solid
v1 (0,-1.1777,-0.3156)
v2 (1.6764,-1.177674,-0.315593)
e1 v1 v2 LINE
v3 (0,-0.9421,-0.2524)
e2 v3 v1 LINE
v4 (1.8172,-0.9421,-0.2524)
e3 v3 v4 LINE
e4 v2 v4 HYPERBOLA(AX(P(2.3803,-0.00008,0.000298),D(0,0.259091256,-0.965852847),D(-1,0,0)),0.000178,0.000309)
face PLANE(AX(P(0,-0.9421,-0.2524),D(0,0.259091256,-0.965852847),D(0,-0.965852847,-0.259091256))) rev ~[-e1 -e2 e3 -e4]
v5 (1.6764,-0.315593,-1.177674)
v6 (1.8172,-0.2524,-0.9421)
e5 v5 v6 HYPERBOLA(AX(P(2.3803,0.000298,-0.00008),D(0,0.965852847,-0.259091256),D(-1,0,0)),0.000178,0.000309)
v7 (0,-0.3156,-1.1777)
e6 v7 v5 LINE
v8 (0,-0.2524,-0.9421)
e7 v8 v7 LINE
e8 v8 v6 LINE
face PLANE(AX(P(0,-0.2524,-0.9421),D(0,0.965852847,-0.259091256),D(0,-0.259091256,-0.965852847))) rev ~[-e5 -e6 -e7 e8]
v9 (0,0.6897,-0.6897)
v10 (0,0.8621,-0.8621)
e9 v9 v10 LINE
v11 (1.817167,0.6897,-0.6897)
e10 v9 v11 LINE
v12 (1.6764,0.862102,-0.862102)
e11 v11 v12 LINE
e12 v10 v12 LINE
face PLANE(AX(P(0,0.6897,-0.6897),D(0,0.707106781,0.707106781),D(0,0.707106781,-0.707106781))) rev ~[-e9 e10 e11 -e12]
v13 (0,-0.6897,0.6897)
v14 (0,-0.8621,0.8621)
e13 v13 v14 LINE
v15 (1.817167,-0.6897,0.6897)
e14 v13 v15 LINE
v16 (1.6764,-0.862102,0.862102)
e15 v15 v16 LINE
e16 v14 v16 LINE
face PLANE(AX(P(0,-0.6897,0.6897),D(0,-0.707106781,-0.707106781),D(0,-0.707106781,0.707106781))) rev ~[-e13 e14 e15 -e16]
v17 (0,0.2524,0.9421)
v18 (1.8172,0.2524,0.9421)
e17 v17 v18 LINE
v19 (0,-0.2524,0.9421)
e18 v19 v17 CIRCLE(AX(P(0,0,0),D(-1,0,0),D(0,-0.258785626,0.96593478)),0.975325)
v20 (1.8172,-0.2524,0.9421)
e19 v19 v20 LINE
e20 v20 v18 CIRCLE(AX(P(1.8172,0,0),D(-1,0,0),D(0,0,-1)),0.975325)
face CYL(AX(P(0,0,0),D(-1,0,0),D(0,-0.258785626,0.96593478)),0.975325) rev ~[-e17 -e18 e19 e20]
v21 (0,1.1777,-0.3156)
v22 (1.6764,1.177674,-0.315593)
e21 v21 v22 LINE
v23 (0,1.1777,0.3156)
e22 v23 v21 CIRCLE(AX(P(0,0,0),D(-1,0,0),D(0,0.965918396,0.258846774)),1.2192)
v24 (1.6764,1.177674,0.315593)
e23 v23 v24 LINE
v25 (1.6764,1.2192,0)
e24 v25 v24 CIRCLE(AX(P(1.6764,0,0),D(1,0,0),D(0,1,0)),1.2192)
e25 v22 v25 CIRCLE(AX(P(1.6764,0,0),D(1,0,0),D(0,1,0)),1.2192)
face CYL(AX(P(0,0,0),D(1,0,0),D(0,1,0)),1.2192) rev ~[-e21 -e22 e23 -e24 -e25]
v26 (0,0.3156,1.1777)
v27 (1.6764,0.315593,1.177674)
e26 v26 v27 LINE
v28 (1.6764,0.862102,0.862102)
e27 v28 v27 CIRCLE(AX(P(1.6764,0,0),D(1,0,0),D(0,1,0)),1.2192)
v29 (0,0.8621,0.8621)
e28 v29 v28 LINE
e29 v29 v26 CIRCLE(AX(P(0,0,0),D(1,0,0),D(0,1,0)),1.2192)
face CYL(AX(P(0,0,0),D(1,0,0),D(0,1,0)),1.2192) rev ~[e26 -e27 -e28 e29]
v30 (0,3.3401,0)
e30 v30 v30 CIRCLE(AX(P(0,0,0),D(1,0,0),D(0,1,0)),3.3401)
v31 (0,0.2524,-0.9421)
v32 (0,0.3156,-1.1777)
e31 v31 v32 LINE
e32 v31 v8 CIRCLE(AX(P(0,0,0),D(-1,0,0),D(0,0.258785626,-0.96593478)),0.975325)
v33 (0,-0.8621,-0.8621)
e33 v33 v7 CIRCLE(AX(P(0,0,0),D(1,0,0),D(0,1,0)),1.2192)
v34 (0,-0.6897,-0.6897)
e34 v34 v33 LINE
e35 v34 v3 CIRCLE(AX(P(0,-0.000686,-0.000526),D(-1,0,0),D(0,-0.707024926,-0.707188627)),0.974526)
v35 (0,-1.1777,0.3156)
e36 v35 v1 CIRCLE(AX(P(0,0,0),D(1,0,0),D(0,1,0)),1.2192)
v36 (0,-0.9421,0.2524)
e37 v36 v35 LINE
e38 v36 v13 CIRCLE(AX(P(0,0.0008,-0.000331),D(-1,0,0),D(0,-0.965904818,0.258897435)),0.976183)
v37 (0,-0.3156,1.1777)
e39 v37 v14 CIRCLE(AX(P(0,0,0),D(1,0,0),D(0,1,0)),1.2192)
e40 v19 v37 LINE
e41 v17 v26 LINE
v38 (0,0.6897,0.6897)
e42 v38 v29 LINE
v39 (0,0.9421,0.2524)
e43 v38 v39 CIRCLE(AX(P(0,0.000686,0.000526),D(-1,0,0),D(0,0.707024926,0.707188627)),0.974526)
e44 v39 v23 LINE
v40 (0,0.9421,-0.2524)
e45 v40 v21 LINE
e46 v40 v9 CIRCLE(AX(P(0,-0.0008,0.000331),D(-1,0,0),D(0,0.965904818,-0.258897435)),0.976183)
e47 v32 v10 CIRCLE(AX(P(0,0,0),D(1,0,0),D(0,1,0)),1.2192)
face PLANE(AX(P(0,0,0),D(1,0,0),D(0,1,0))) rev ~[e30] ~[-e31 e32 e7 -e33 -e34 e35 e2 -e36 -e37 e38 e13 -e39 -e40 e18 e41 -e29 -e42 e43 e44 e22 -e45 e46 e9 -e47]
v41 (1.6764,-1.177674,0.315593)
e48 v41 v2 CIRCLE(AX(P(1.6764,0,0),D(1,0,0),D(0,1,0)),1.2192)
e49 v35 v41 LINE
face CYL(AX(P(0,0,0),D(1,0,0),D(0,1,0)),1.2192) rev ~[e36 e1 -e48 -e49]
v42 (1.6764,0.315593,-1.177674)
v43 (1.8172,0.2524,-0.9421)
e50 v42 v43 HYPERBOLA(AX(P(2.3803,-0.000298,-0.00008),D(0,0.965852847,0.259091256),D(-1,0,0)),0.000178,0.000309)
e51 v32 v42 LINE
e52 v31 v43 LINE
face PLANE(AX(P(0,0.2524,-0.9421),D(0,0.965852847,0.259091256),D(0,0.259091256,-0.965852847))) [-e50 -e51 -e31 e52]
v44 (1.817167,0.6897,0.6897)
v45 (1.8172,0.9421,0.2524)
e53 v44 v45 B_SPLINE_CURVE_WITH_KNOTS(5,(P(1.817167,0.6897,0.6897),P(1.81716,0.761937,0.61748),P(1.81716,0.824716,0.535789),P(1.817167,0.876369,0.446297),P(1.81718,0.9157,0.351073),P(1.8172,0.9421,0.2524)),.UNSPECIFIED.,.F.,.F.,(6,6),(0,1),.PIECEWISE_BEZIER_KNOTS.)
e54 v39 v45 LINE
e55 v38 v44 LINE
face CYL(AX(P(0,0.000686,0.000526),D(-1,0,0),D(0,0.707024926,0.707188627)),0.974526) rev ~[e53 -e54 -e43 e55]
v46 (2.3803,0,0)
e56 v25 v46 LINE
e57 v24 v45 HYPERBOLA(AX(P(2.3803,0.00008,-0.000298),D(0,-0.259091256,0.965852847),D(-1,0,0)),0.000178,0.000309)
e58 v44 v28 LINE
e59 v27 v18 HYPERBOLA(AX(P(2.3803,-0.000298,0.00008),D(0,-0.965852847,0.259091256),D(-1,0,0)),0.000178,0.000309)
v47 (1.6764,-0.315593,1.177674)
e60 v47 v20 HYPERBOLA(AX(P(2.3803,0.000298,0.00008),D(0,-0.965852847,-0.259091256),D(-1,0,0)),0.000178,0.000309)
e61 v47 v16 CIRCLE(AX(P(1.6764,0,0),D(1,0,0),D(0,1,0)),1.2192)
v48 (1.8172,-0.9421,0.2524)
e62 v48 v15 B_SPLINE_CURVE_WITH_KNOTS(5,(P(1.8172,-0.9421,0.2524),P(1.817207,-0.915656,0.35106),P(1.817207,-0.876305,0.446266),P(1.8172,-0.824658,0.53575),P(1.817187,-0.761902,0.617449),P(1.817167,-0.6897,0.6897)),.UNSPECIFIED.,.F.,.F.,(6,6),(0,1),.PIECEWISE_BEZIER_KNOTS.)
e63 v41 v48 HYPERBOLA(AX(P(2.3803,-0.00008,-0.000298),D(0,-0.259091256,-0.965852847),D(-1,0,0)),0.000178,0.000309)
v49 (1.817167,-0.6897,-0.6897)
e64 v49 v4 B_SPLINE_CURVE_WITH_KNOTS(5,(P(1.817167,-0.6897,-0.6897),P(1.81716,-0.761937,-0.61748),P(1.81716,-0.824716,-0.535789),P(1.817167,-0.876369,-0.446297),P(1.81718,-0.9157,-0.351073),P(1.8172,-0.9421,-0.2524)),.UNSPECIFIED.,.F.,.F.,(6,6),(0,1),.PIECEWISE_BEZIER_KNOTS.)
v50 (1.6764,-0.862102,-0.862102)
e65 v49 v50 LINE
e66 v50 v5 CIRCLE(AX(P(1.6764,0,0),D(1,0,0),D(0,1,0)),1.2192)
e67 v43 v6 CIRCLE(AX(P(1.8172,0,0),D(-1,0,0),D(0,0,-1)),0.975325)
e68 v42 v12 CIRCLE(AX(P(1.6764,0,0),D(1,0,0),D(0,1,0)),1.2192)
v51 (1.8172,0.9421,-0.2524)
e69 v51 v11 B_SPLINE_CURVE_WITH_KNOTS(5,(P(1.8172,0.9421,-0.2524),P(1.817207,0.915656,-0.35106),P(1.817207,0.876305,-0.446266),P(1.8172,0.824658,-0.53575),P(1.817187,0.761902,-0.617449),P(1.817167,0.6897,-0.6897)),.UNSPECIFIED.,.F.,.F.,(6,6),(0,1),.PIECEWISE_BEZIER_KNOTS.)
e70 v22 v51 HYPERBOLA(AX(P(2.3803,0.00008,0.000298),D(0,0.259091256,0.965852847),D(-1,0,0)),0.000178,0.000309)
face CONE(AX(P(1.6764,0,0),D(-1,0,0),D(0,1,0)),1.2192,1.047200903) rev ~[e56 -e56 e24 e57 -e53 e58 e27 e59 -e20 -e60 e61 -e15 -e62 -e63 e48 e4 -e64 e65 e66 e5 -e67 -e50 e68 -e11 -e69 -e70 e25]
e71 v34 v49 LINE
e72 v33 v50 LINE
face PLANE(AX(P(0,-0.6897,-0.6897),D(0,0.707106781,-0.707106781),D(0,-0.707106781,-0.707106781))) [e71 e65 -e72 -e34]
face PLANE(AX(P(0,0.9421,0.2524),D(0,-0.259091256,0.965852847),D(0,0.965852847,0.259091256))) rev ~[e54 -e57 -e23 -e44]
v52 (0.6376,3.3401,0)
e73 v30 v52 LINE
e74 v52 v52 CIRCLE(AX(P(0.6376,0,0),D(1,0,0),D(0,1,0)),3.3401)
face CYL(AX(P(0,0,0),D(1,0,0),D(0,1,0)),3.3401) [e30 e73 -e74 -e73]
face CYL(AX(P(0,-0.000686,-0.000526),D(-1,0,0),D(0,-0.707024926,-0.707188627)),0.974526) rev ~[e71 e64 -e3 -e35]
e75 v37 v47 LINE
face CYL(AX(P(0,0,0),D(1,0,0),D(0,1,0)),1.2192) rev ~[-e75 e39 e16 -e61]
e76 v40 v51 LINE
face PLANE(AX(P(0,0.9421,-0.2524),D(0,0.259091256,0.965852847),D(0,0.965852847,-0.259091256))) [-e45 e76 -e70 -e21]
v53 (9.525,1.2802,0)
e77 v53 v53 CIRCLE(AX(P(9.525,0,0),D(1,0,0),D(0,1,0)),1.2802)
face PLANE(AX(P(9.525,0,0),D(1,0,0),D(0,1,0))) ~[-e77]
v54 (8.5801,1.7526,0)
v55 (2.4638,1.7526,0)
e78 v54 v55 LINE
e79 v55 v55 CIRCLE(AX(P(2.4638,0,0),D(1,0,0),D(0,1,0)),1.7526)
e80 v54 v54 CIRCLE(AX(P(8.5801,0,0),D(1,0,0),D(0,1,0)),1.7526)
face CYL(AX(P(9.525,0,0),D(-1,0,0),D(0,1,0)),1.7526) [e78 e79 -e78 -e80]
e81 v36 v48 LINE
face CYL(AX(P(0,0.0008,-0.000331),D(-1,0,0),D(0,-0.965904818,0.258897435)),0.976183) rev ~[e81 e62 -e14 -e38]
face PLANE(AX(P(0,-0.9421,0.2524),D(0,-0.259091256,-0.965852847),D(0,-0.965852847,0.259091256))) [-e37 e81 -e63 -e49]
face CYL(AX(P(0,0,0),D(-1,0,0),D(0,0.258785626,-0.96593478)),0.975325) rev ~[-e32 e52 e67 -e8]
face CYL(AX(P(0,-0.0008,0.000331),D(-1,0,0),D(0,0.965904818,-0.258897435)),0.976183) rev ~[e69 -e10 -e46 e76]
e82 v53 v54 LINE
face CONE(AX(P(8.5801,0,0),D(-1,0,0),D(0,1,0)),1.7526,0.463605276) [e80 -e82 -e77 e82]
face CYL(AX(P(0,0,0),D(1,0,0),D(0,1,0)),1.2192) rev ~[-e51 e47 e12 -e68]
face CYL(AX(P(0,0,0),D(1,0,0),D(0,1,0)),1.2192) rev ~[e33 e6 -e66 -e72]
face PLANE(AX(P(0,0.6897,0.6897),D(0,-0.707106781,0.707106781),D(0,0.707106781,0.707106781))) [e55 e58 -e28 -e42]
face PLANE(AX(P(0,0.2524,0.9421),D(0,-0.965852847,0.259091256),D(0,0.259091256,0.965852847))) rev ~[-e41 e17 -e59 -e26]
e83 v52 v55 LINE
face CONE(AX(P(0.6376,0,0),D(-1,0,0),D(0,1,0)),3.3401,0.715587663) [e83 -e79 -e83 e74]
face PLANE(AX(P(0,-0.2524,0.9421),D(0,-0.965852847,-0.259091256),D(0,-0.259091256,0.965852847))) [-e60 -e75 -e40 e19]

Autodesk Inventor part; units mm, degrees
ref_plane "YZ Plane" through (0, 0, 0) normal (1, 0, 0) x (0, 1, 0)
ref_plane "XZ Plane" through (0, 0, 0) normal (0, 1, 0) x (-1, 0, 0)
sketch "Sketch1" plane through (0, 0, 0) normal (0, 0, 1) x (1, 0, 0)
  line L0 (9.525, 0) -> (9.525, 1.7526)
  line L1 (9.525, 1.7526) -> (2.4638, 1.7526)
  line L2 (0, 3.3401) -> (0, 1.2192)
  line L3 (0, 1.2192) -> (1.6764, 1.2192)
  line L4 (1.6764, 1.2192) -> (2.3803, 0)
  line L5 (2.3803, 0) -> (9.525, 0)
  line L6 (0, 3.3401) -> (0.6376, 3.3401)
  line L7 (0.6376, 3.3401) -> (2.4638, 1.7526)
  line L8 (-1.905, 0) -> (11.43, 0) projected
  line L9 (0, -0.668) -> (0, 4.0081) projected
  dimension "d0" = 9.525
  dimension "d1" = 1.6764
  dimension "d2" = 3.5052
  dimension "d3" = 2.4638
  dimension "d4" = 41
  dimension "d5" = 2.4384
  dimension "d6" = 60
  dimension "d7" = 6.6802
revolve "Body" add sketch "Sketch1" angle 360 about axis through (2.3803, 0, 0) along (1, 0, 0) contours L5 L4 L3 L2 L6 L7 L1 L0
sketch "Sketch2" plane through (0, 0, 0) normal (-1, 0, 0) x (0, 0, 1)
  circle A0 centre (0, 0) radius 3.3401 projected
  circle A1 centre (0, 0) radius 1.2192 projected
  line L0 (0.9421, 0.2524) -> (1.1777, 0.3156)
  line L1 (0.9421, -0.2524) -> (1.1777, -0.3156)
  arc A2 (0.9421, -0.2524) -> (0.9421, 0.2524) centre (0, 0) ccw
  arc A3 (1.1777, -0.3156) -> (1.1777, 0.3156) centre (0, 0) ccw
  line L2 (0, -4.6761) -> (0, 4.6761) projected
  line L3 (-4.6761, 0) -> (4.6761, 0) projected
  line L4 (0.9421, 0.2524) -> (0, 0) construction
  line L5 (0, 0) -> (0.9421, -0.2524) construction
  line L6 (0.2524, 0.9421) -> (0.3156, 1.1777)
  line L7 (0.6897, 0.6897) -> (0.8621, 0.8621)
  arc A4 (0.6897, 0.6897) -> (0.2524, 0.9421) centre (0, 0) ccw
  arc A5 (0.8621, 0.8621) -> (0.3156, 1.1777) centre (0, 0) ccw
  line L8 (-0.6897, 0.6897) -> (-0.8621, 0.8621)
  line L9 (-0.2524, 0.9421) -> (-0.3156, 1.1777)
  arc A6 (-0.2524, 0.9421) -> (-0.6897, 0.6897) centre (0, 0) ccw
  arc A7 (-0.3156, 1.1777) -> (-0.8621, 0.8621) centre (0, 0) ccw
  line L10 (-0.9421, -0.2524) -> (-1.1777, -0.3156)
  line L11 (-0.9421, 0.2524) -> (-1.1777, 0.3156)
  arc A8 (-0.9421, 0.2524) -> (-0.9421, -0.2524) centre (0, 0) ccw
  arc A9 (-1.1777, 0.3156) -> (-1.1777, -0.3156) centre (0, 0) ccw
  line L12 (-0.2524, -0.9421) -> (-0.3156, -1.1777)
  line L13 (-0.6897, -0.6897) -> (-0.8621, -0.8621)
  arc A10 (-0.6897, -0.6897) -> (-0.2524, -0.9421) centre (0, 0) ccw
  arc A11 (-0.8621, -0.8621) -> (-0.3156, -1.1777) centre (0, 0) ccw
  line L14 (0.6897, -0.6897) -> (0.8621, -0.8621)
  line L15 (0.2524, -0.9421) -> (0.3156, -1.1777)
  arc A12 (0.2524, -0.9421) -> (0.6897, -0.6897) centre (0, 0) ccw
  arc A13 (0.3156, -1.1777) -> (0.8621, -0.8621) centre (0, 0) ccw
  dimension "d8" = 1.9507
  dimension "d9" = 2.4384
  dimension "d10" = 15
  dimension "d11" = 15
  dimension "d22" = 360
extrude "Slot" add sketch "Sketch2" against normal up to next contours L3 A2 L0 A1 | A1 L1 A2 L3 | L3 A8 L10 A1 | A1 L11 A8 L3 | A1 L7 A4 L6 | L9 A6 L8 A1 | A1 L13 A10 L12 | L15 A12 L14 A1
thread "Thread" size "6-32 UNC" class "2A" standard "ANSI Unified Screw Threads" length 5.077
chamfer "Chamfer1" distance 0.4724 distance2 0.9449 1 edges at (9.525, -1.7526, 0) measured on face at (9.525, 0.5842, 0.7748)
ref_plane "Work Plane1" through (66.6877, 0, 0) normal (0, 0, -1) x (1, 0, 0)
equation "\"d0\" = NLG"
equation "\"d1\" = INTI"
equation "\"d2\" = GD"
equation "\"d3\" = KOH"
equation "\"d4\" = 0.5 * SEWI"
equation "\"d5\" = SW"
equation "\"d7\" = KOD"
equation "\"d8\" = 0.8 * SW"
equation "\"d9\" = SW"
equation "\"d15\" = GEL"
equation "\"d17\" = -0.5 * SPD + 0.5 * GD"
equation "\"d18\" = GUL"
equation "\"NLG\" = 9.525"
equation "\"SW\" = 2.4384"
equation "\"INTI\" = 1.6764"
equation "\"GEL\" = 5.07695"
equation "\"KOH\" = 2.4638"
equation "\"KOD\" = 6.6802"
equation "\"GUL\" = 0.94488"
equation "\"SPD\" = 2.56032"
equation "\"GD\" = NND"
equation "\"SEWI\" = 82deg"
equation "\"TOA\" = 30deg"
equation "\"GD1\" = SPD"
equation "\"EPV\" = 4.4794"
equation "\"THREADDIA\" = 3.5052"
equation "\"BDM\" = NND"
equation "\"NND\" = 3.5052"
equation "\"GAL\" = 1.9845"
equation "\"E0\" = 1.155 * SW"
properties part number "ANSI B18.3 - 6-32 UNC x 0.375, SSFCHCSI" material "Steel, Mild"
